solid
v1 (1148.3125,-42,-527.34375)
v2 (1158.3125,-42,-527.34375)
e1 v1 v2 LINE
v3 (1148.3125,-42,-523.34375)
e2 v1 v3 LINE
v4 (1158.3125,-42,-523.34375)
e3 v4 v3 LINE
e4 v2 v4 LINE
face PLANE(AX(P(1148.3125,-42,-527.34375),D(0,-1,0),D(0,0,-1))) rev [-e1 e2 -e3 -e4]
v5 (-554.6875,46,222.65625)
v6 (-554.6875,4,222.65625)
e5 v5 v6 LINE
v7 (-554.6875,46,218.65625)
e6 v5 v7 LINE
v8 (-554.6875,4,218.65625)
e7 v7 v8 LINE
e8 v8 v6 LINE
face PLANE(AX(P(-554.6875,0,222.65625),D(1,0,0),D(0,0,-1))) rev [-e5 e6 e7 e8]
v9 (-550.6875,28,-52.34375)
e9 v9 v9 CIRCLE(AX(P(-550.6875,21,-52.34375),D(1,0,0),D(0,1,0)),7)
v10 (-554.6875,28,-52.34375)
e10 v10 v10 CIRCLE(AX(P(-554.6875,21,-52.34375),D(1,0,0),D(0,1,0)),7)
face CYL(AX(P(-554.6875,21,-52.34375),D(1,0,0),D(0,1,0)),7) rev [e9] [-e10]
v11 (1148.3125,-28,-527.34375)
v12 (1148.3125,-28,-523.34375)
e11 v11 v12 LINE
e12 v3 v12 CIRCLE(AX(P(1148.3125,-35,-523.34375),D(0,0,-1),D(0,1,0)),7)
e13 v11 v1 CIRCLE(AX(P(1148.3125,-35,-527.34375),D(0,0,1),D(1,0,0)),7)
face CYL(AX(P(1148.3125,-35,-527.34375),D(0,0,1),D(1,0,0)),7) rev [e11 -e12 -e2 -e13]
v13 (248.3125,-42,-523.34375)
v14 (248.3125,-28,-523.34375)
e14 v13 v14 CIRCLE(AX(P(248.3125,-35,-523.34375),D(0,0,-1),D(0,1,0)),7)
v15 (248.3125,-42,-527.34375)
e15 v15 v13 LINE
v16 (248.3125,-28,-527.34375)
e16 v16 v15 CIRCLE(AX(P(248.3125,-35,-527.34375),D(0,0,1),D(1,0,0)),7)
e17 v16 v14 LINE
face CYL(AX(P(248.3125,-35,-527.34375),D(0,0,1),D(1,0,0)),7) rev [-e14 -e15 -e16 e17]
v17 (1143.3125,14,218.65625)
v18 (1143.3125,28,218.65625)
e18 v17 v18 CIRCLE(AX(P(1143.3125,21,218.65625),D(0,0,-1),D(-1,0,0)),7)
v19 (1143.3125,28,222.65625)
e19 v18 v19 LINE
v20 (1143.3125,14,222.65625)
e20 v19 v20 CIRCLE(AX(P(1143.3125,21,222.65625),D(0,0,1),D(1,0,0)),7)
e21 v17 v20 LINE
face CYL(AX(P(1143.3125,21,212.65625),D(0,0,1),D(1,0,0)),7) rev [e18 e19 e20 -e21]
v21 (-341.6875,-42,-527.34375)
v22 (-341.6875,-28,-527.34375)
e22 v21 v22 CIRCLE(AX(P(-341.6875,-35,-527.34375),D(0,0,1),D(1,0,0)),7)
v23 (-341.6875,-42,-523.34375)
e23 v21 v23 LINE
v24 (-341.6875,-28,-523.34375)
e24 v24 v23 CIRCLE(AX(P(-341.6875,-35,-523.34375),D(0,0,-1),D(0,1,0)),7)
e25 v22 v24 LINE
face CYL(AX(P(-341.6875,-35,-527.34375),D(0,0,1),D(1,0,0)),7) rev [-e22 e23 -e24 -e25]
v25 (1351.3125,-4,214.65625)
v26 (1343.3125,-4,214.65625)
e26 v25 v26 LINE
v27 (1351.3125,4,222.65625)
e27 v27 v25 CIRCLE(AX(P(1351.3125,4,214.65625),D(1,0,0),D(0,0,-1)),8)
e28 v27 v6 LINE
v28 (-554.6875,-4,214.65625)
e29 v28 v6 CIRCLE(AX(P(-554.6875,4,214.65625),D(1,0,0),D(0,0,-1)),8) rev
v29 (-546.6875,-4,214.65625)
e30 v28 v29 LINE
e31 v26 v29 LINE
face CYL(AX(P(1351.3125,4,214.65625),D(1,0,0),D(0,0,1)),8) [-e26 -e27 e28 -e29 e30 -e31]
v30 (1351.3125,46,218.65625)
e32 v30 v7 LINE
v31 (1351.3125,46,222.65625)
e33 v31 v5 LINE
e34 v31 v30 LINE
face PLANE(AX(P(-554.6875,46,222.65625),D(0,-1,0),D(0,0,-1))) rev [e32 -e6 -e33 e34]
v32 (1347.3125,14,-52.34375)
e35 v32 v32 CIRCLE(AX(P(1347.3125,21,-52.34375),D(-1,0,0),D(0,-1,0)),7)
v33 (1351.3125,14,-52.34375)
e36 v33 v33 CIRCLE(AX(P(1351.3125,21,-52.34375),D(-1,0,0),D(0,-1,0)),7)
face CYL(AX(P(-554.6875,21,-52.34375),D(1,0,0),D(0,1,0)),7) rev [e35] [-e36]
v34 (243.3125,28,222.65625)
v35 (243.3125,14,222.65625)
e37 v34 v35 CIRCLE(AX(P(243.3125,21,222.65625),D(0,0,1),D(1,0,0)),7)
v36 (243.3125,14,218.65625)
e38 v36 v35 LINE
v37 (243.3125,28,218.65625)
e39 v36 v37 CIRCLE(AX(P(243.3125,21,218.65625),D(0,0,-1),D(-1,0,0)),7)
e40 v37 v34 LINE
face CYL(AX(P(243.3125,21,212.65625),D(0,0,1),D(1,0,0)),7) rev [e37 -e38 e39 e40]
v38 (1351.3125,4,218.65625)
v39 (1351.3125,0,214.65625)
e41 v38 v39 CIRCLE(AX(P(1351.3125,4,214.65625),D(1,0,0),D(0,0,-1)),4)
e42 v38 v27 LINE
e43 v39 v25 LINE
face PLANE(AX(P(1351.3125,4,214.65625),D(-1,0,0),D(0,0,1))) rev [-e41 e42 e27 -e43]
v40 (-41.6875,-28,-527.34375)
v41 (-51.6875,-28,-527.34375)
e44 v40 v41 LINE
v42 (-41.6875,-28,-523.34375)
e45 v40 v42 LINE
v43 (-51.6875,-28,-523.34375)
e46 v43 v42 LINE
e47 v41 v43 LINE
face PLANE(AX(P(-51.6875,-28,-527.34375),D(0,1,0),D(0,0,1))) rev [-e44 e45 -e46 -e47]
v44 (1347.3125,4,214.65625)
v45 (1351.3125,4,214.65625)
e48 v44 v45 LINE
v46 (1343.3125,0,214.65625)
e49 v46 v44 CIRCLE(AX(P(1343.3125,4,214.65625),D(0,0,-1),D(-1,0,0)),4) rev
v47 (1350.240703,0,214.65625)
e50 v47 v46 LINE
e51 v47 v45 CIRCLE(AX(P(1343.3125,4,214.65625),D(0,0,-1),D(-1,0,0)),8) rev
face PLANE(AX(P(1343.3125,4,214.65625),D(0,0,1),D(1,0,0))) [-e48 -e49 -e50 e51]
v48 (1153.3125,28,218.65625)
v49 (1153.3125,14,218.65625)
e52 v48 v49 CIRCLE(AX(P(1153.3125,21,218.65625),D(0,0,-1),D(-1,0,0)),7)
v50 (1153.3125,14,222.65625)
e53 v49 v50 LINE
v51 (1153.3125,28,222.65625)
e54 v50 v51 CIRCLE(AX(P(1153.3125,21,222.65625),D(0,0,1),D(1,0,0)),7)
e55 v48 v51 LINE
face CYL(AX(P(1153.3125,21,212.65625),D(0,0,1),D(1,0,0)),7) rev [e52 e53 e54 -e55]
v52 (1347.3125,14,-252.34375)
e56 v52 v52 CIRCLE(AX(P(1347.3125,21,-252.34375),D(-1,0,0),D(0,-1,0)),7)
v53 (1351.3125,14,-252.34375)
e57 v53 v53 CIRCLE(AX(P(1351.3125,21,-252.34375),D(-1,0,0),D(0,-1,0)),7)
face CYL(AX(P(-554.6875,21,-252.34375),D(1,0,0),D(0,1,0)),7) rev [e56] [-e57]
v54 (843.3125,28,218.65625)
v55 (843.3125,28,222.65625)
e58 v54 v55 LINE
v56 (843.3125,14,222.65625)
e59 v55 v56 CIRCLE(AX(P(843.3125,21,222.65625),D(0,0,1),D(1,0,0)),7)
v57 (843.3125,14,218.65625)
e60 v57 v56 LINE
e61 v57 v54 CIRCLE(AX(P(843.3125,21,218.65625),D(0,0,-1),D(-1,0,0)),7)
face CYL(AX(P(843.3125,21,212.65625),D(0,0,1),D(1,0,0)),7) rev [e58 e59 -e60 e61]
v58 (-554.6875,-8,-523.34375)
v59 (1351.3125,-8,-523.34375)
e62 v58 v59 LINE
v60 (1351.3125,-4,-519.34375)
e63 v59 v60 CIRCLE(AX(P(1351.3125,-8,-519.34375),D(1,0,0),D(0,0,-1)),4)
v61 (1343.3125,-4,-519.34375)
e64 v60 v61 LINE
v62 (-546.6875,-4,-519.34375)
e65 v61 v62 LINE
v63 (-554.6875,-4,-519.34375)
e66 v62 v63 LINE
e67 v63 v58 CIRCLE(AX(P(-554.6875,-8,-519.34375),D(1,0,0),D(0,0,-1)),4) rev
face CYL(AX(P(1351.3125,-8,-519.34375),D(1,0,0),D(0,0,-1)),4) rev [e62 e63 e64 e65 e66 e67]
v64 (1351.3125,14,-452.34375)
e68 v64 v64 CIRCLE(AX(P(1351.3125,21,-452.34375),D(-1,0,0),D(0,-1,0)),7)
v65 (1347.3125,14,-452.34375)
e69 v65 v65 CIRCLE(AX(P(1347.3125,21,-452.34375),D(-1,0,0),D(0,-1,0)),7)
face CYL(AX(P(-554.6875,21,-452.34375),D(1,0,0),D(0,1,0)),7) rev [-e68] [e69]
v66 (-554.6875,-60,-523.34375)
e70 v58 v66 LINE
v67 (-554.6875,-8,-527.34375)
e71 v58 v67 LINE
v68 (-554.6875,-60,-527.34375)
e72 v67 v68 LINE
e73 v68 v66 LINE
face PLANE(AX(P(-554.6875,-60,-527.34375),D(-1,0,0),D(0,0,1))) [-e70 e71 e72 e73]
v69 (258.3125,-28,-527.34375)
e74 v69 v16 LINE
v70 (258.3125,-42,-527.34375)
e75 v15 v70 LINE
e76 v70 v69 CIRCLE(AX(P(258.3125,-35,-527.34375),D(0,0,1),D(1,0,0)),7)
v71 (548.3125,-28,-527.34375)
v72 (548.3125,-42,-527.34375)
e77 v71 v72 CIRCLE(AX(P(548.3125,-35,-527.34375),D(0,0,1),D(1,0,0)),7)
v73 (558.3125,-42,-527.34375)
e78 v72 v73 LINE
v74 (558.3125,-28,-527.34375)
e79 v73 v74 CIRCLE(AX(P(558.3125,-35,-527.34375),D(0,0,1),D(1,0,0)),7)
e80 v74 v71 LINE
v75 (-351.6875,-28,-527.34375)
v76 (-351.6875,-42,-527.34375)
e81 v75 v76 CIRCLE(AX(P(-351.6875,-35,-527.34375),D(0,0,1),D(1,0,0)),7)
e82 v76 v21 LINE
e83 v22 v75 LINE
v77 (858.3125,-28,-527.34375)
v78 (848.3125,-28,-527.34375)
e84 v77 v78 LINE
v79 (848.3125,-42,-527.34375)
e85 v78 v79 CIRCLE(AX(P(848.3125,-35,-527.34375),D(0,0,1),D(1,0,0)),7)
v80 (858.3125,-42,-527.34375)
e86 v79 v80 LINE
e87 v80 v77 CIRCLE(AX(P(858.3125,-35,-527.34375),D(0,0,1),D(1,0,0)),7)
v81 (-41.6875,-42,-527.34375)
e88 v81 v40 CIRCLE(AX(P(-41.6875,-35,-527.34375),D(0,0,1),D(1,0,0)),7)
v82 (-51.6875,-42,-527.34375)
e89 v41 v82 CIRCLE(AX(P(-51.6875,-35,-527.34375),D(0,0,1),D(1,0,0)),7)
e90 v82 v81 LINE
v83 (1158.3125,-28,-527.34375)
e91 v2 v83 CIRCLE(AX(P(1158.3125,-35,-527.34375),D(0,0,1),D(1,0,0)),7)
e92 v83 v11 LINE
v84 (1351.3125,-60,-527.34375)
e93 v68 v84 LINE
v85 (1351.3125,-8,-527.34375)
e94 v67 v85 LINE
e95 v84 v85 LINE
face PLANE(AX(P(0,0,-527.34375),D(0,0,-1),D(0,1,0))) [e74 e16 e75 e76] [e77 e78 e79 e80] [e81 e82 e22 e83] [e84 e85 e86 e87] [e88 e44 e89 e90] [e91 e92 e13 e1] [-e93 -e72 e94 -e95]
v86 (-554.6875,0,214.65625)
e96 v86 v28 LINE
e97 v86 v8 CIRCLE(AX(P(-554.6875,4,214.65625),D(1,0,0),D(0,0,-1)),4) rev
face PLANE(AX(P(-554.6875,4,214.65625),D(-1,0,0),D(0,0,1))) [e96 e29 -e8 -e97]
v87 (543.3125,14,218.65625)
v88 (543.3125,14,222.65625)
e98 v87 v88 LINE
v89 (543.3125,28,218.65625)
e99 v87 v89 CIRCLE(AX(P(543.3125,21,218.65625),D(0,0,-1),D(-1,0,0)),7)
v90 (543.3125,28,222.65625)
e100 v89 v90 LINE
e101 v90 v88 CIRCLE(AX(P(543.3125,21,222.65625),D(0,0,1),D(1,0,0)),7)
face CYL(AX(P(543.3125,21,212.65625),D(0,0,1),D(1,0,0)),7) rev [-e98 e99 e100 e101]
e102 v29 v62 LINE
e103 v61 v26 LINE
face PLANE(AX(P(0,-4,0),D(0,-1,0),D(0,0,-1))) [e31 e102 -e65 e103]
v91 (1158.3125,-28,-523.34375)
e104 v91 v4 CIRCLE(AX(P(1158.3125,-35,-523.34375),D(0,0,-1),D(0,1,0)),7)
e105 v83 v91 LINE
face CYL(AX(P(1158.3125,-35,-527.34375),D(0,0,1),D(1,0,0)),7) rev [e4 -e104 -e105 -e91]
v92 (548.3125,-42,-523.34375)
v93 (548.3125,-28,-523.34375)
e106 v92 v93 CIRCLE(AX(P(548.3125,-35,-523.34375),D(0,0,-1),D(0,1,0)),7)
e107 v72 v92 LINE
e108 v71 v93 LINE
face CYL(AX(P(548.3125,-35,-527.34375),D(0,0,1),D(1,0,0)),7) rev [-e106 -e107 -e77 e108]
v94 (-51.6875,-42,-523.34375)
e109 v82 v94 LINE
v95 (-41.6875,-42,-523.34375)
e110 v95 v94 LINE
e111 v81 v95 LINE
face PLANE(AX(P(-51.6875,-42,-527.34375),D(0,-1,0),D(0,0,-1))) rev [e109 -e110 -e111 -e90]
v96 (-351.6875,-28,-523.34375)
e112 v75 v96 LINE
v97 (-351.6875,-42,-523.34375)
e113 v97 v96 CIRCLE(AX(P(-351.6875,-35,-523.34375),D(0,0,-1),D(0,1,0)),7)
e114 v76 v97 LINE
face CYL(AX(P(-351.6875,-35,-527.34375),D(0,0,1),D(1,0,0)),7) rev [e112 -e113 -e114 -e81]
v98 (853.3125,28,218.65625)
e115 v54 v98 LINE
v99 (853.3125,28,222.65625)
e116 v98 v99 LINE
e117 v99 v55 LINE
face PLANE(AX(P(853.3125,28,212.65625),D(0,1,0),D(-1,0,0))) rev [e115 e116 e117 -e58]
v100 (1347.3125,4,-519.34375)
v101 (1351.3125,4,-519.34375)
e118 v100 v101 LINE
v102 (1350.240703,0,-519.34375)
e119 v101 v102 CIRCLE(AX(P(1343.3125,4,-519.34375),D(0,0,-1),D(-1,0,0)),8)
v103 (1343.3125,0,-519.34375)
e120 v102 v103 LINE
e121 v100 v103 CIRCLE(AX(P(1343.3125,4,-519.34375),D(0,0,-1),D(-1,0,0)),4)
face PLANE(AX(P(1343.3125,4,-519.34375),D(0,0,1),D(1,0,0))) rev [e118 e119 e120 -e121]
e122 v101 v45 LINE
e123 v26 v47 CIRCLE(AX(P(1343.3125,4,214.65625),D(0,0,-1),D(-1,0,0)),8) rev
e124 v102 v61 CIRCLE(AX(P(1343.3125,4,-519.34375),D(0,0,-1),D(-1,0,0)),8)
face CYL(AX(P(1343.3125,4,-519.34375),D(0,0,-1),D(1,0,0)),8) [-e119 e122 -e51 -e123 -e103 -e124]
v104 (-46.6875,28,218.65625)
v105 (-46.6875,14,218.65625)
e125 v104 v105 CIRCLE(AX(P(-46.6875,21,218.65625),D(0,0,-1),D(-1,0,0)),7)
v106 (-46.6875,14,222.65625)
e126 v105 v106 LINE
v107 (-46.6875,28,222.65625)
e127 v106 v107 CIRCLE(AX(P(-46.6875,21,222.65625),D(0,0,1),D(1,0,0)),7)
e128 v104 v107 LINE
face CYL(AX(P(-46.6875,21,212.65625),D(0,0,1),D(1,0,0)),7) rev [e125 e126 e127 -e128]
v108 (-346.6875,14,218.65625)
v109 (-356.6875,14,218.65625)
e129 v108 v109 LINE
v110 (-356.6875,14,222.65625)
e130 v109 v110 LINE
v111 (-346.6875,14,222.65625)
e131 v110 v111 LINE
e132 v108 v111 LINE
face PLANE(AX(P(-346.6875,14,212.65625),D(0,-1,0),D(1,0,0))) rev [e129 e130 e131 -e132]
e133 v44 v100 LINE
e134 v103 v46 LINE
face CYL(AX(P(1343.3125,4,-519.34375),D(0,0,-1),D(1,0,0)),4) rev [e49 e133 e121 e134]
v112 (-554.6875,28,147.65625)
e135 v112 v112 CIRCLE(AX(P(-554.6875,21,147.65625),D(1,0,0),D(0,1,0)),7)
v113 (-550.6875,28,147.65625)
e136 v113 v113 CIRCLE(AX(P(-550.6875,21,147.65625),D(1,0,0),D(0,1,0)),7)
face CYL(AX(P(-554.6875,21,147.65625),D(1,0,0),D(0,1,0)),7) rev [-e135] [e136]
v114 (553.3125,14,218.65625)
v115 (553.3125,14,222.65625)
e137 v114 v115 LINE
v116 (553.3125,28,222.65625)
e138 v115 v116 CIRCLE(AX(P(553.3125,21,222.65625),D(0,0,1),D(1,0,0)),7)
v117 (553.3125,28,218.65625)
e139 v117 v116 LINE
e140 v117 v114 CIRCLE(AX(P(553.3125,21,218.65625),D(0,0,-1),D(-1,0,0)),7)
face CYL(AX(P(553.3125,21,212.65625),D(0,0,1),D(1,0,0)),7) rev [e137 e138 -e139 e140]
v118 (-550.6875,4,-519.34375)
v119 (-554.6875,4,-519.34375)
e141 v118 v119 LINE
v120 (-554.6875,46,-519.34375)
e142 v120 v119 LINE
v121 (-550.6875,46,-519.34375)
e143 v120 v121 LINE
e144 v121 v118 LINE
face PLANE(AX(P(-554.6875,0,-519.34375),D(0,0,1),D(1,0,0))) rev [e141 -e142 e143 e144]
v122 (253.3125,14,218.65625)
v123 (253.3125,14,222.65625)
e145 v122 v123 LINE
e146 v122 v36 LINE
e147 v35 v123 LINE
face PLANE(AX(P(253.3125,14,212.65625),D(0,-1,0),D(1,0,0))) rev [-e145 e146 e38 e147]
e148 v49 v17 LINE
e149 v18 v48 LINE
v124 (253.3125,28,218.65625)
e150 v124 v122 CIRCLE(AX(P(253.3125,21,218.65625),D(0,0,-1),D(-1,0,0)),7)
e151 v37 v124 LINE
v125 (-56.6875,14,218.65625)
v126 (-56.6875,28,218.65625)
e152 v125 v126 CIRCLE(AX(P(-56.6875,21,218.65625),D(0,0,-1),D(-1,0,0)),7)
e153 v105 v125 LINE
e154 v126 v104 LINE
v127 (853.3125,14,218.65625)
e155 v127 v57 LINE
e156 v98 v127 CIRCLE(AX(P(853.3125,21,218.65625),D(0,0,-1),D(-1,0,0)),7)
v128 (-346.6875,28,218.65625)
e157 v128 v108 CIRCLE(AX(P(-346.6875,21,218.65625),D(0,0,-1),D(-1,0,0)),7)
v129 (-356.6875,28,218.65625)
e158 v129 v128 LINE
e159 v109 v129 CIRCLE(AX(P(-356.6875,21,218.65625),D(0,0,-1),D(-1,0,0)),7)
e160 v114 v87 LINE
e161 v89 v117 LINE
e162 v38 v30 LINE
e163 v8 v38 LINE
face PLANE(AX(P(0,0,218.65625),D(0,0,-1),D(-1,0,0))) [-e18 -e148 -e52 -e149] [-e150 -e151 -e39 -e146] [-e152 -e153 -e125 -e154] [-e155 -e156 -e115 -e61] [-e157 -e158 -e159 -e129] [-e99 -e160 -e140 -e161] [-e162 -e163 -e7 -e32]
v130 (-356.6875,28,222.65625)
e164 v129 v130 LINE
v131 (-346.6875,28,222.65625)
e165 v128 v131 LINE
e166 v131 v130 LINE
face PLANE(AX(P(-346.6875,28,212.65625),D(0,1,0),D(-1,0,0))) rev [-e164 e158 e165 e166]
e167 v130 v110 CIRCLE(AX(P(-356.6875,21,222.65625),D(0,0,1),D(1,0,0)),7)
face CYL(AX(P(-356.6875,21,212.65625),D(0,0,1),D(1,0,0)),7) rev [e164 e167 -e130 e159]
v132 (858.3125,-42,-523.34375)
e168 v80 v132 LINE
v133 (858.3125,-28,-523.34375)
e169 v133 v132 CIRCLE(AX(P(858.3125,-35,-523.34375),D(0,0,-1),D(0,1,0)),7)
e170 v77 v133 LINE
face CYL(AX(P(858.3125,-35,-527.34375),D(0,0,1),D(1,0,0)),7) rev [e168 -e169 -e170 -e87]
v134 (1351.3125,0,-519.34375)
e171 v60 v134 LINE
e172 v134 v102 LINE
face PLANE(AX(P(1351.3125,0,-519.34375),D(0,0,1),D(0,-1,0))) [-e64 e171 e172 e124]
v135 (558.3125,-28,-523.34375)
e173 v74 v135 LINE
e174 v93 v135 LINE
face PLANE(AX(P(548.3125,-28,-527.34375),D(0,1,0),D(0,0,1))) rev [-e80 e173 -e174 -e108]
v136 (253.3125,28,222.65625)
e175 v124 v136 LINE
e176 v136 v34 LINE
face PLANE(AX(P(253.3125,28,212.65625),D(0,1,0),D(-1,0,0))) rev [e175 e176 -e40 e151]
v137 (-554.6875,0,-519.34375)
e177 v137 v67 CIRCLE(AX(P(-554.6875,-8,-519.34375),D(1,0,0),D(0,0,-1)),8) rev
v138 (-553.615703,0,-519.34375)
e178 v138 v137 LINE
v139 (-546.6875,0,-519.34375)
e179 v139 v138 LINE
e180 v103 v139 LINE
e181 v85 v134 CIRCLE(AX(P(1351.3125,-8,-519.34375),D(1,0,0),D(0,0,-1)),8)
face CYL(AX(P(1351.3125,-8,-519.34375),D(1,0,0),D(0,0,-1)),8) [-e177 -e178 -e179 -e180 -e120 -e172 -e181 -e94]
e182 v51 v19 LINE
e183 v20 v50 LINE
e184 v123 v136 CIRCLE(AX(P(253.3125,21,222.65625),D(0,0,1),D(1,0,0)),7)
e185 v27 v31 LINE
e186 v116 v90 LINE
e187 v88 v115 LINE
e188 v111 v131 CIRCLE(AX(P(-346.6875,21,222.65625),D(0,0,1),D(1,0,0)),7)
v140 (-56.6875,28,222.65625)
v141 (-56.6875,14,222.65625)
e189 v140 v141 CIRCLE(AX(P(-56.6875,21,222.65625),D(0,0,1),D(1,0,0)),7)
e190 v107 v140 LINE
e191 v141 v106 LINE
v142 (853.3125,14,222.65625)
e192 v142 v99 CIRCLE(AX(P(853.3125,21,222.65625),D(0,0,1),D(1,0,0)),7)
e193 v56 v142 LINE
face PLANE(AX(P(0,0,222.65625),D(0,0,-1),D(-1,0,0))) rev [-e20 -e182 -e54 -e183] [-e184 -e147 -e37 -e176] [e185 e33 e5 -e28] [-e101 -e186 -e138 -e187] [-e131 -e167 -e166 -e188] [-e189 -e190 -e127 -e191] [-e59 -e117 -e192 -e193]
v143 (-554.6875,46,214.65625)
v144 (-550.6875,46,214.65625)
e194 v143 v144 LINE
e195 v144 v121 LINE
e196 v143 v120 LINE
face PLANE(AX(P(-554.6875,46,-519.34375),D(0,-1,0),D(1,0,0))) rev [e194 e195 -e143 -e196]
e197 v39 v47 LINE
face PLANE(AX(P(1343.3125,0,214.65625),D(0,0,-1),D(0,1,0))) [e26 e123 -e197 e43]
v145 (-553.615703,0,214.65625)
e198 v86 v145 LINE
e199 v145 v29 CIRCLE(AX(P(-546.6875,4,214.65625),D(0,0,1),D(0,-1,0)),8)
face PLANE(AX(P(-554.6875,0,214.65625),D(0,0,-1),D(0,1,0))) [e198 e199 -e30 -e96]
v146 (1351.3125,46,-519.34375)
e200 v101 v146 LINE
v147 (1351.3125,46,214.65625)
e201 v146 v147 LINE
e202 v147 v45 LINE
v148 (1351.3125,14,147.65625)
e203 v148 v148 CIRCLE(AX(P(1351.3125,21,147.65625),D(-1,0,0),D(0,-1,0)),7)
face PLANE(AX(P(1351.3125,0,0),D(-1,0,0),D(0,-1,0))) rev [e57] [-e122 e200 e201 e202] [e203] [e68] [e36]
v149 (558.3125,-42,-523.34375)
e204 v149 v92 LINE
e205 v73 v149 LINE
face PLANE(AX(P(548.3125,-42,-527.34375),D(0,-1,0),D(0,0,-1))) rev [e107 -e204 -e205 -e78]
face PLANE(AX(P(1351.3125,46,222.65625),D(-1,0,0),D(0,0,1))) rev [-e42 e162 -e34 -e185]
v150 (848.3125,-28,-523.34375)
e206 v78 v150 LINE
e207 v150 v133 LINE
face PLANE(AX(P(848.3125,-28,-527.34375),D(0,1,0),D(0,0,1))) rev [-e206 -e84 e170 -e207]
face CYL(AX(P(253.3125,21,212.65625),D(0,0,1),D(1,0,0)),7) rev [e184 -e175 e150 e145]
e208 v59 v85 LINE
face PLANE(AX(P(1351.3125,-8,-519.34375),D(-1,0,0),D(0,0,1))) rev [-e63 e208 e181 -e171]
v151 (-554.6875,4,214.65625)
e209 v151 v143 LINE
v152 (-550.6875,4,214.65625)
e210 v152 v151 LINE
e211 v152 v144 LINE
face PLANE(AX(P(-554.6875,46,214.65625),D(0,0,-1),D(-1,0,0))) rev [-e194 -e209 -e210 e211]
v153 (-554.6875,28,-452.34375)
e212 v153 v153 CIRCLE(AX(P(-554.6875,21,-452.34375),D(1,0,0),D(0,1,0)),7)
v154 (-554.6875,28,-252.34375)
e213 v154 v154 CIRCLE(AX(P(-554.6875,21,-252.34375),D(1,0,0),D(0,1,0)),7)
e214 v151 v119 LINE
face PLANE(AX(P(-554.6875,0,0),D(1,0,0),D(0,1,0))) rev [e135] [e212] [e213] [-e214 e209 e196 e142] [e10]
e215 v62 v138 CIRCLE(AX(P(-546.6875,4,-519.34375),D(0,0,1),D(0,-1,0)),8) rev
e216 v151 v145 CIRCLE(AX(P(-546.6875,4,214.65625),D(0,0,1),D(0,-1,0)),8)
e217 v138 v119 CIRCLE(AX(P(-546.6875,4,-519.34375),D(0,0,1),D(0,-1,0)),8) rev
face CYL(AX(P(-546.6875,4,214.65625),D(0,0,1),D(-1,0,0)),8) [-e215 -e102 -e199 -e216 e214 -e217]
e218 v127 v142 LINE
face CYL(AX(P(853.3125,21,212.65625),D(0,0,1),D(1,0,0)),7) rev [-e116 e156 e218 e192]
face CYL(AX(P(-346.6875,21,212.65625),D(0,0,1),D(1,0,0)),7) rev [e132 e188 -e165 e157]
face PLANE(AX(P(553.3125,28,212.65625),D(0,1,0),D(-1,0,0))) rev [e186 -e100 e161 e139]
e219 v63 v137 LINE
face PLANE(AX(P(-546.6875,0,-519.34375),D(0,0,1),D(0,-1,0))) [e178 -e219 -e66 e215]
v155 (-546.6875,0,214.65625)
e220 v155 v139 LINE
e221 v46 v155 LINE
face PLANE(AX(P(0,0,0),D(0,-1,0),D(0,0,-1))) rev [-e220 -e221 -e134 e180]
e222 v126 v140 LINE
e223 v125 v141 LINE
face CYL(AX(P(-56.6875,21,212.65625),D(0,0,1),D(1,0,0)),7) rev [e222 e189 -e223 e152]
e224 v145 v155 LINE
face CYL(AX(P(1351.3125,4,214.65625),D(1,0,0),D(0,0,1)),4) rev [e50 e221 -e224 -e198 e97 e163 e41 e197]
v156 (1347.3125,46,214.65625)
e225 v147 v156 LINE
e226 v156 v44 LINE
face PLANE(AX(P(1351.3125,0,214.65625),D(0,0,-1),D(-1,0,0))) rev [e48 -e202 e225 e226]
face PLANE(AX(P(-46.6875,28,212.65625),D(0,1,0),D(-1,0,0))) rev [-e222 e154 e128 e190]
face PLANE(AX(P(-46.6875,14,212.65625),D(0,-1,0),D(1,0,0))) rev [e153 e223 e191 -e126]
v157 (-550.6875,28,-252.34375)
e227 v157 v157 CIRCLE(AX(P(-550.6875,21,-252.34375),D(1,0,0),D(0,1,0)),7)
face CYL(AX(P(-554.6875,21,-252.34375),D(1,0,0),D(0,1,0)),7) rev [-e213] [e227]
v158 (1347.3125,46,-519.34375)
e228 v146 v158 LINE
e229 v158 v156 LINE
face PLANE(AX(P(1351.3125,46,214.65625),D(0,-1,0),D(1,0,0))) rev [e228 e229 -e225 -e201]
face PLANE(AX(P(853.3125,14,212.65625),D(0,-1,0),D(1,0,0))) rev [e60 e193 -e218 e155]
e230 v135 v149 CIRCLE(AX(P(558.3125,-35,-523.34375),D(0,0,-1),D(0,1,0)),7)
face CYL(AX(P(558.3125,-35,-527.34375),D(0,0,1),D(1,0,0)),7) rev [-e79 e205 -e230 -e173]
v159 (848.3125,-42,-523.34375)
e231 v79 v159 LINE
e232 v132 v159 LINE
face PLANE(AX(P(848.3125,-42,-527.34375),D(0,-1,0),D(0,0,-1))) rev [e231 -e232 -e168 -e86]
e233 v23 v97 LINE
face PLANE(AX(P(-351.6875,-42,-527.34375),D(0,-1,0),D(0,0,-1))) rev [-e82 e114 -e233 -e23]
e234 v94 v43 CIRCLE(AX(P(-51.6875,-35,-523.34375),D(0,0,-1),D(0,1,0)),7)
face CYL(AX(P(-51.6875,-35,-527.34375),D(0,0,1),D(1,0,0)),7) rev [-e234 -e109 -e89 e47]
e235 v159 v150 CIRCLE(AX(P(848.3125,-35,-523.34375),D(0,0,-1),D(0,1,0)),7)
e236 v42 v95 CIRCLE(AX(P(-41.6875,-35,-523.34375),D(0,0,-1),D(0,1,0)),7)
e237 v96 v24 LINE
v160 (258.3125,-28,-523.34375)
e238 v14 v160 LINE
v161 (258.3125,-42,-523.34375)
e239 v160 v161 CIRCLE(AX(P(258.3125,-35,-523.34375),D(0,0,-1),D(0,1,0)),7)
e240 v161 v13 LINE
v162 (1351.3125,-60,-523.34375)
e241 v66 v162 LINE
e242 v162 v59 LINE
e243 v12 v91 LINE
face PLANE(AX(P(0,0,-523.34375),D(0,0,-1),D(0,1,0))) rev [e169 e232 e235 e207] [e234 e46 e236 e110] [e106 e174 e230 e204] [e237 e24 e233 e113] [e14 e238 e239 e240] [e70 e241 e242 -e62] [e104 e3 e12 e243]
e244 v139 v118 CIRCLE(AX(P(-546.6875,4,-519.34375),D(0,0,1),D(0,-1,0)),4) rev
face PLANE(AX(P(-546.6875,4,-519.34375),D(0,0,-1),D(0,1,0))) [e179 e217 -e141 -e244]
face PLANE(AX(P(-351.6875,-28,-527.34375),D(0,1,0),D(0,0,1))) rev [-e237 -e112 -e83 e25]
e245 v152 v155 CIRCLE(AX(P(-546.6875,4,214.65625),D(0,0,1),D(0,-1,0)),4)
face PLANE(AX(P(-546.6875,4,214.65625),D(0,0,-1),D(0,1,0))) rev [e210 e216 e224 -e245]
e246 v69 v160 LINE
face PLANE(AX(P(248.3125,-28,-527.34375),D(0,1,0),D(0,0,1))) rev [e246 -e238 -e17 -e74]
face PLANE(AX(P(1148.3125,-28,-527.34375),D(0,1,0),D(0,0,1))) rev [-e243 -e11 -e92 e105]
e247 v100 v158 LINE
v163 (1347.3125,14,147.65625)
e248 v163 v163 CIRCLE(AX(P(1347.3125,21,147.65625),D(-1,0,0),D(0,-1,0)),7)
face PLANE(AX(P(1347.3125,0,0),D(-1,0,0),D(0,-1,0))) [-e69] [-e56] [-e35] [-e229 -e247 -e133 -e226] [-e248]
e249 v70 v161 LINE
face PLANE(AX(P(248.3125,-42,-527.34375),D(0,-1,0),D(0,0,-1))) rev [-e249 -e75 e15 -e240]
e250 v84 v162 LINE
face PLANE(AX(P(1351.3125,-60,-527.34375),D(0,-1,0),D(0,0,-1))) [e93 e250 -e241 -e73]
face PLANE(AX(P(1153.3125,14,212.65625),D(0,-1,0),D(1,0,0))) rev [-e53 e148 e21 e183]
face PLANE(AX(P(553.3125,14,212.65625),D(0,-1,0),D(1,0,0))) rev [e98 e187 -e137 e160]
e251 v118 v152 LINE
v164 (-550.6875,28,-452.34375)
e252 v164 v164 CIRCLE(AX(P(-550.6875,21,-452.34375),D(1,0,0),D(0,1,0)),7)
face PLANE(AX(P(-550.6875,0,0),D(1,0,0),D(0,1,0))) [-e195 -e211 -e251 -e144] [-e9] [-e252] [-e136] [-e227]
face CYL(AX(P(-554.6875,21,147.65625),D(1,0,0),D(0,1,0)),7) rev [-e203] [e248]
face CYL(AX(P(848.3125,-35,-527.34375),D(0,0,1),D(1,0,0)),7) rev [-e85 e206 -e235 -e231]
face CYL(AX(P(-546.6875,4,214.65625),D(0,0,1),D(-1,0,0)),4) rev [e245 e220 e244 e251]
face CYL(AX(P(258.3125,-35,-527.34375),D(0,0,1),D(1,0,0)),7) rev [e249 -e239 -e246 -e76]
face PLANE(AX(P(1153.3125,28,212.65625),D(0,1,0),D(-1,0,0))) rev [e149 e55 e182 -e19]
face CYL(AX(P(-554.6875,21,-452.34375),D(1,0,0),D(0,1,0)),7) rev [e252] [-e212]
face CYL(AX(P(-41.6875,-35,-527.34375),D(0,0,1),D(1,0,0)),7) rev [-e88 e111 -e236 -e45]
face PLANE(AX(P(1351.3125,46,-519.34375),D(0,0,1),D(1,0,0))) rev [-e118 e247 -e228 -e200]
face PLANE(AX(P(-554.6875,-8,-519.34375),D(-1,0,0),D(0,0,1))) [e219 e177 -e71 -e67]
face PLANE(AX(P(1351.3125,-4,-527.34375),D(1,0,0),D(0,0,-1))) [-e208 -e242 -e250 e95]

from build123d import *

# Parameters (mm, degrees)
SKETCH1_W                    = 1906
SKETCH1_H                    = 750
BASE_FLANGE1_DEPTH           = 4
EDGE_FLANGE1_STRIP_W         = 24
EDGE_FLANGE1_STRIP_H         = 4
EDGE_FLANGE1_STRIP_CUT_DEPTH = 1906
EDGE_FLANGE1_DEPTH           = 1906
EDGE_FLANGE2_STRIP_W         = 24
EDGE_FLANGE2_STRIP_H         = 4
EDGE_FLANGE2_STRIP_CUT_DEPTH = 1906
EDGE_FLANGE2_DEPTH           = 1906
EDGE_FLANGE3_STRIP_W         = 24
EDGE_FLANGE3_STRIP_H         = 4
EDGE_FLANGE3_STRIP_CUT_DEPTH = 734
EDGE_FLANGE3_DEPTH           = 734
EDGE_FLANGE4_STRIP_W         = 24
EDGE_FLANGE4_STRIP_H         = 4
EDGE_FLANGE4_STRIP_CUT_DEPTH = 734
EDGE_FLANGE4_DEPTH           = 734
SKETCH18_R                   = 7
CUT_EXTRUDE4_DEPTH           = 1979.516472174
LPATTERN1_COUNT              = 4
LPATTERN1_PITCH              = 200
CUT_EXTRUDE5_DEPTH           = 10
LPATTERN2_COUNT              = 6
LPATTERN2_PITCH              = 300
CUT_EXTRUDE6_DEPTH           = 1545.720516034
LPATTERN3_COUNT              = 6
LPATTERN3_PITCH              = 300


# Sheet-metal steps are written as plain solids
with BuildPart() as part:
    # Sketch1 → Base-Flange1 (new body)
    with BuildSketch(Plane(origin=(0, 0, 0), x_dir=(1, 0, 0), z_dir=(0, 1, 0))):
        with Locations((398.3125, 152.34375)):
            Rectangle(SKETCH1_W, SKETCH1_H)
    extrude(amount=-BASE_FLANGE1_DEPTH)

    # Edge-Flange1 strip (across the edge) → Edge-Flange1 strip cut (cut)
    with BuildSketch(Plane(origin=(-554.6875, -4, -527.34375), x_dir=(0, 0, 1), z_dir=(1, 0, 0))):
        with Locations((-4, -2)):
            Rectangle(EDGE_FLANGE1_STRIP_W, EDGE_FLANGE1_STRIP_H)
    extrude(amount=EDGE_FLANGE1_STRIP_CUT_DEPTH, mode=Mode.SUBTRACT)

    # Edge-Flange1 section (across the edge) → Edge-Flange1 (add)
    with BuildSketch(Plane(origin=(-554.6875, -4, -527.34375), x_dir=(0, 0, 1), z_dir=(1, 0, 0))):
        with BuildLine():
            Line((0, 4), (0, 56))
            Line((0, 56), (4, 56))
            Line((4, 56), (4, 4))
            ThreePointArc((4, 4), (5.171572875, 1.171572875), (8, 0))
            Line((8, 0), (8, -4))
            ThreePointArc((8, -4), (2.343145751, -1.656854249), (0, 4))
        make_face()
    extrude(amount=EDGE_FLANGE1_DEPTH)

    # Edge-Flange2 strip (across the edge) → Edge-Flange2 strip cut (cut)
    with BuildSketch(Plane(origin=(-554.6875, 0, 222.65625), x_dir=(0, 0, -1), z_dir=(1, 0, 0))):
        with Locations((-4, -2)):
            Rectangle(EDGE_FLANGE2_STRIP_W, EDGE_FLANGE2_STRIP_H)
    extrude(amount=EDGE_FLANGE2_STRIP_CUT_DEPTH, mode=Mode.SUBTRACT)

    # Edge-Flange2 section (across the edge) → Edge-Flange2 (add)
    with BuildSketch(Plane(origin=(-554.6875, 0, 222.65625), x_dir=(0, 0, -1), z_dir=(1, 0, 0))):
        with BuildLine():
            Line((0, 4), (0, 46))
            Line((0, 46), (4, 46))
            Line((4, 46), (4, 4))
            ThreePointArc((4, 4), (5.171572875, 1.171572875), (8, 0))
            Line((8, 0), (8, -4))
            ThreePointArc((8, -4), (2.343145751, -1.656854249), (0, 4))
        make_face()
    extrude(amount=EDGE_FLANGE2_DEPTH)

    # Edge-Flange3 strip (across the edge) → Edge-Flange3 strip cut (cut)
    with BuildSketch(Plane(origin=(1351.3125, 0, 214.65625), x_dir=(-1, 0, 0), z_dir=(0, 0, -1))):
        with Locations((-4, -2)):
            Rectangle(EDGE_FLANGE3_STRIP_W, EDGE_FLANGE3_STRIP_H)
    extrude(amount=EDGE_FLANGE3_STRIP_CUT_DEPTH, mode=Mode.SUBTRACT)

    # Edge-Flange3 section (across the edge) → Edge-Flange3 (add)
    with BuildSketch(Plane(origin=(1351.3125, 0, 214.65625), x_dir=(-1, 0, 0), z_dir=(0, 0, -1))):
        with BuildLine():
            Line((0, 4), (0, 46))
            Line((0, 46), (4, 46))
            Line((4, 46), (4, 4))
            ThreePointArc((4, 4), (5.171572875, 1.171572875), (8, 0))
            Line((8, 0), (8, -4))
            ThreePointArc((8, -4), (2.343145751, -1.656854249), (0, 4))
        make_face()
    extrude(amount=EDGE_FLANGE3_DEPTH)

    # Edge-Flange4 strip (across the edge) → Edge-Flange4 strip cut (cut)
    with BuildSketch(Plane(origin=(-554.6875, 0, -519.34375), x_dir=(1, 0, 0), z_dir=(0, 0, 1))):
        with Locations((-4, -2)):
            Rectangle(EDGE_FLANGE4_STRIP_W, EDGE_FLANGE4_STRIP_H)
    extrude(amount=EDGE_FLANGE4_STRIP_CUT_DEPTH, mode=Mode.SUBTRACT)

    # Edge-Flange4 section (across the edge) → Edge-Flange4 (add)
    with BuildSketch(Plane(origin=(-554.6875, 0, -519.34375), x_dir=(1, 0, 0), z_dir=(0, 0, 1))):
        with BuildLine():
            Line((0, 4), (0, 46))
            Line((0, 46), (4, 46))
            Line((4, 46), (4, 4))
            ThreePointArc((4, 4), (5.171572875, 1.171572875), (8, 0))
            Line((8, 0), (8, -4))
            ThreePointArc((8, -4), (2.343145751, -1.656854249), (0, 4))
        make_face()
    extrude(amount=EDGE_FLANGE4_DEPTH)

    # Sketch18 → Cut-Extrude4 (cut, symmetric)
    with BuildSketch(Plane(origin=(1351.3125, 0, 0), x_dir=(0, 0, -1), z_dir=(1, 0, 0))):
        with Locations(Location((-147.65625, 21, 0), (0, 0, 90))):
            Circle(SKETCH18_R)
    cut_extrude4 = extrude(amount=CUT_EXTRUDE4_DEPTH, both=True, mode=Mode.SUBTRACT)

    # LPattern1: Cut-Extrude4 ×4
    with Locations(*[(0, 0, -i * LPATTERN1_PITCH) for i in range(1, LPATTERN1_COUNT)]):
        add(cut_extrude4, mode=Mode.SUBTRACT)

    # Sketch19 → Cut-Extrude5 (cut)
    with BuildSketch(Plane.XY.offset(222.65625)):
        with BuildLine():
            Line((1153.3125, 14), (1143.3125, 14))
            ThreePointArc((1143.3125, 14), (1136.3125, 21), (1143.3125, 28))
            Line((1143.3125, 28), (1153.3125, 28))
            ThreePointArc((1153.3125, 28), (1160.3125, 21), (1153.3125, 14))
        make_face()
    cut_extrude5 = extrude(amount=-CUT_EXTRUDE5_DEPTH, mode=Mode.SUBTRACT)

    # LPattern2: Cut-Extrude5 ×6
    with Locations(*[(-i * LPATTERN2_PITCH, 0, 0) for i in range(1, LPATTERN2_COUNT)]):
        add(cut_extrude5, mode=Mode.SUBTRACT)

    # Sketch20 → Cut-Extrude6 (cut, symmetric)
    with BuildSketch(Plane.XY.offset(-523.34375)):
        with BuildLine():
            Line((-351.6875, -28), (-341.6875, -28))
            ThreePointArc((-341.6875, -28), (-334.6875, -35), (-341.6875, -42))
            Line((-341.6875, -42), (-351.6875, -42))
            ThreePointArc((-351.6875, -42), (-358.6875, -35), (-351.6875, -28))
        make_face()
    cut_extrude6 = extrude(amount=CUT_EXTRUDE6_DEPTH, both=True, mode=Mode.SUBTRACT)

    # LPattern3: Cut-Extrude6 ×6
    with Locations(*[(i * LPATTERN3_PITCH, 0, 0) for i in range(1, LPATTERN3_COUNT)]):
        add(cut_extrude6, mode=Mode.SUBTRACT)


solid = part.part
